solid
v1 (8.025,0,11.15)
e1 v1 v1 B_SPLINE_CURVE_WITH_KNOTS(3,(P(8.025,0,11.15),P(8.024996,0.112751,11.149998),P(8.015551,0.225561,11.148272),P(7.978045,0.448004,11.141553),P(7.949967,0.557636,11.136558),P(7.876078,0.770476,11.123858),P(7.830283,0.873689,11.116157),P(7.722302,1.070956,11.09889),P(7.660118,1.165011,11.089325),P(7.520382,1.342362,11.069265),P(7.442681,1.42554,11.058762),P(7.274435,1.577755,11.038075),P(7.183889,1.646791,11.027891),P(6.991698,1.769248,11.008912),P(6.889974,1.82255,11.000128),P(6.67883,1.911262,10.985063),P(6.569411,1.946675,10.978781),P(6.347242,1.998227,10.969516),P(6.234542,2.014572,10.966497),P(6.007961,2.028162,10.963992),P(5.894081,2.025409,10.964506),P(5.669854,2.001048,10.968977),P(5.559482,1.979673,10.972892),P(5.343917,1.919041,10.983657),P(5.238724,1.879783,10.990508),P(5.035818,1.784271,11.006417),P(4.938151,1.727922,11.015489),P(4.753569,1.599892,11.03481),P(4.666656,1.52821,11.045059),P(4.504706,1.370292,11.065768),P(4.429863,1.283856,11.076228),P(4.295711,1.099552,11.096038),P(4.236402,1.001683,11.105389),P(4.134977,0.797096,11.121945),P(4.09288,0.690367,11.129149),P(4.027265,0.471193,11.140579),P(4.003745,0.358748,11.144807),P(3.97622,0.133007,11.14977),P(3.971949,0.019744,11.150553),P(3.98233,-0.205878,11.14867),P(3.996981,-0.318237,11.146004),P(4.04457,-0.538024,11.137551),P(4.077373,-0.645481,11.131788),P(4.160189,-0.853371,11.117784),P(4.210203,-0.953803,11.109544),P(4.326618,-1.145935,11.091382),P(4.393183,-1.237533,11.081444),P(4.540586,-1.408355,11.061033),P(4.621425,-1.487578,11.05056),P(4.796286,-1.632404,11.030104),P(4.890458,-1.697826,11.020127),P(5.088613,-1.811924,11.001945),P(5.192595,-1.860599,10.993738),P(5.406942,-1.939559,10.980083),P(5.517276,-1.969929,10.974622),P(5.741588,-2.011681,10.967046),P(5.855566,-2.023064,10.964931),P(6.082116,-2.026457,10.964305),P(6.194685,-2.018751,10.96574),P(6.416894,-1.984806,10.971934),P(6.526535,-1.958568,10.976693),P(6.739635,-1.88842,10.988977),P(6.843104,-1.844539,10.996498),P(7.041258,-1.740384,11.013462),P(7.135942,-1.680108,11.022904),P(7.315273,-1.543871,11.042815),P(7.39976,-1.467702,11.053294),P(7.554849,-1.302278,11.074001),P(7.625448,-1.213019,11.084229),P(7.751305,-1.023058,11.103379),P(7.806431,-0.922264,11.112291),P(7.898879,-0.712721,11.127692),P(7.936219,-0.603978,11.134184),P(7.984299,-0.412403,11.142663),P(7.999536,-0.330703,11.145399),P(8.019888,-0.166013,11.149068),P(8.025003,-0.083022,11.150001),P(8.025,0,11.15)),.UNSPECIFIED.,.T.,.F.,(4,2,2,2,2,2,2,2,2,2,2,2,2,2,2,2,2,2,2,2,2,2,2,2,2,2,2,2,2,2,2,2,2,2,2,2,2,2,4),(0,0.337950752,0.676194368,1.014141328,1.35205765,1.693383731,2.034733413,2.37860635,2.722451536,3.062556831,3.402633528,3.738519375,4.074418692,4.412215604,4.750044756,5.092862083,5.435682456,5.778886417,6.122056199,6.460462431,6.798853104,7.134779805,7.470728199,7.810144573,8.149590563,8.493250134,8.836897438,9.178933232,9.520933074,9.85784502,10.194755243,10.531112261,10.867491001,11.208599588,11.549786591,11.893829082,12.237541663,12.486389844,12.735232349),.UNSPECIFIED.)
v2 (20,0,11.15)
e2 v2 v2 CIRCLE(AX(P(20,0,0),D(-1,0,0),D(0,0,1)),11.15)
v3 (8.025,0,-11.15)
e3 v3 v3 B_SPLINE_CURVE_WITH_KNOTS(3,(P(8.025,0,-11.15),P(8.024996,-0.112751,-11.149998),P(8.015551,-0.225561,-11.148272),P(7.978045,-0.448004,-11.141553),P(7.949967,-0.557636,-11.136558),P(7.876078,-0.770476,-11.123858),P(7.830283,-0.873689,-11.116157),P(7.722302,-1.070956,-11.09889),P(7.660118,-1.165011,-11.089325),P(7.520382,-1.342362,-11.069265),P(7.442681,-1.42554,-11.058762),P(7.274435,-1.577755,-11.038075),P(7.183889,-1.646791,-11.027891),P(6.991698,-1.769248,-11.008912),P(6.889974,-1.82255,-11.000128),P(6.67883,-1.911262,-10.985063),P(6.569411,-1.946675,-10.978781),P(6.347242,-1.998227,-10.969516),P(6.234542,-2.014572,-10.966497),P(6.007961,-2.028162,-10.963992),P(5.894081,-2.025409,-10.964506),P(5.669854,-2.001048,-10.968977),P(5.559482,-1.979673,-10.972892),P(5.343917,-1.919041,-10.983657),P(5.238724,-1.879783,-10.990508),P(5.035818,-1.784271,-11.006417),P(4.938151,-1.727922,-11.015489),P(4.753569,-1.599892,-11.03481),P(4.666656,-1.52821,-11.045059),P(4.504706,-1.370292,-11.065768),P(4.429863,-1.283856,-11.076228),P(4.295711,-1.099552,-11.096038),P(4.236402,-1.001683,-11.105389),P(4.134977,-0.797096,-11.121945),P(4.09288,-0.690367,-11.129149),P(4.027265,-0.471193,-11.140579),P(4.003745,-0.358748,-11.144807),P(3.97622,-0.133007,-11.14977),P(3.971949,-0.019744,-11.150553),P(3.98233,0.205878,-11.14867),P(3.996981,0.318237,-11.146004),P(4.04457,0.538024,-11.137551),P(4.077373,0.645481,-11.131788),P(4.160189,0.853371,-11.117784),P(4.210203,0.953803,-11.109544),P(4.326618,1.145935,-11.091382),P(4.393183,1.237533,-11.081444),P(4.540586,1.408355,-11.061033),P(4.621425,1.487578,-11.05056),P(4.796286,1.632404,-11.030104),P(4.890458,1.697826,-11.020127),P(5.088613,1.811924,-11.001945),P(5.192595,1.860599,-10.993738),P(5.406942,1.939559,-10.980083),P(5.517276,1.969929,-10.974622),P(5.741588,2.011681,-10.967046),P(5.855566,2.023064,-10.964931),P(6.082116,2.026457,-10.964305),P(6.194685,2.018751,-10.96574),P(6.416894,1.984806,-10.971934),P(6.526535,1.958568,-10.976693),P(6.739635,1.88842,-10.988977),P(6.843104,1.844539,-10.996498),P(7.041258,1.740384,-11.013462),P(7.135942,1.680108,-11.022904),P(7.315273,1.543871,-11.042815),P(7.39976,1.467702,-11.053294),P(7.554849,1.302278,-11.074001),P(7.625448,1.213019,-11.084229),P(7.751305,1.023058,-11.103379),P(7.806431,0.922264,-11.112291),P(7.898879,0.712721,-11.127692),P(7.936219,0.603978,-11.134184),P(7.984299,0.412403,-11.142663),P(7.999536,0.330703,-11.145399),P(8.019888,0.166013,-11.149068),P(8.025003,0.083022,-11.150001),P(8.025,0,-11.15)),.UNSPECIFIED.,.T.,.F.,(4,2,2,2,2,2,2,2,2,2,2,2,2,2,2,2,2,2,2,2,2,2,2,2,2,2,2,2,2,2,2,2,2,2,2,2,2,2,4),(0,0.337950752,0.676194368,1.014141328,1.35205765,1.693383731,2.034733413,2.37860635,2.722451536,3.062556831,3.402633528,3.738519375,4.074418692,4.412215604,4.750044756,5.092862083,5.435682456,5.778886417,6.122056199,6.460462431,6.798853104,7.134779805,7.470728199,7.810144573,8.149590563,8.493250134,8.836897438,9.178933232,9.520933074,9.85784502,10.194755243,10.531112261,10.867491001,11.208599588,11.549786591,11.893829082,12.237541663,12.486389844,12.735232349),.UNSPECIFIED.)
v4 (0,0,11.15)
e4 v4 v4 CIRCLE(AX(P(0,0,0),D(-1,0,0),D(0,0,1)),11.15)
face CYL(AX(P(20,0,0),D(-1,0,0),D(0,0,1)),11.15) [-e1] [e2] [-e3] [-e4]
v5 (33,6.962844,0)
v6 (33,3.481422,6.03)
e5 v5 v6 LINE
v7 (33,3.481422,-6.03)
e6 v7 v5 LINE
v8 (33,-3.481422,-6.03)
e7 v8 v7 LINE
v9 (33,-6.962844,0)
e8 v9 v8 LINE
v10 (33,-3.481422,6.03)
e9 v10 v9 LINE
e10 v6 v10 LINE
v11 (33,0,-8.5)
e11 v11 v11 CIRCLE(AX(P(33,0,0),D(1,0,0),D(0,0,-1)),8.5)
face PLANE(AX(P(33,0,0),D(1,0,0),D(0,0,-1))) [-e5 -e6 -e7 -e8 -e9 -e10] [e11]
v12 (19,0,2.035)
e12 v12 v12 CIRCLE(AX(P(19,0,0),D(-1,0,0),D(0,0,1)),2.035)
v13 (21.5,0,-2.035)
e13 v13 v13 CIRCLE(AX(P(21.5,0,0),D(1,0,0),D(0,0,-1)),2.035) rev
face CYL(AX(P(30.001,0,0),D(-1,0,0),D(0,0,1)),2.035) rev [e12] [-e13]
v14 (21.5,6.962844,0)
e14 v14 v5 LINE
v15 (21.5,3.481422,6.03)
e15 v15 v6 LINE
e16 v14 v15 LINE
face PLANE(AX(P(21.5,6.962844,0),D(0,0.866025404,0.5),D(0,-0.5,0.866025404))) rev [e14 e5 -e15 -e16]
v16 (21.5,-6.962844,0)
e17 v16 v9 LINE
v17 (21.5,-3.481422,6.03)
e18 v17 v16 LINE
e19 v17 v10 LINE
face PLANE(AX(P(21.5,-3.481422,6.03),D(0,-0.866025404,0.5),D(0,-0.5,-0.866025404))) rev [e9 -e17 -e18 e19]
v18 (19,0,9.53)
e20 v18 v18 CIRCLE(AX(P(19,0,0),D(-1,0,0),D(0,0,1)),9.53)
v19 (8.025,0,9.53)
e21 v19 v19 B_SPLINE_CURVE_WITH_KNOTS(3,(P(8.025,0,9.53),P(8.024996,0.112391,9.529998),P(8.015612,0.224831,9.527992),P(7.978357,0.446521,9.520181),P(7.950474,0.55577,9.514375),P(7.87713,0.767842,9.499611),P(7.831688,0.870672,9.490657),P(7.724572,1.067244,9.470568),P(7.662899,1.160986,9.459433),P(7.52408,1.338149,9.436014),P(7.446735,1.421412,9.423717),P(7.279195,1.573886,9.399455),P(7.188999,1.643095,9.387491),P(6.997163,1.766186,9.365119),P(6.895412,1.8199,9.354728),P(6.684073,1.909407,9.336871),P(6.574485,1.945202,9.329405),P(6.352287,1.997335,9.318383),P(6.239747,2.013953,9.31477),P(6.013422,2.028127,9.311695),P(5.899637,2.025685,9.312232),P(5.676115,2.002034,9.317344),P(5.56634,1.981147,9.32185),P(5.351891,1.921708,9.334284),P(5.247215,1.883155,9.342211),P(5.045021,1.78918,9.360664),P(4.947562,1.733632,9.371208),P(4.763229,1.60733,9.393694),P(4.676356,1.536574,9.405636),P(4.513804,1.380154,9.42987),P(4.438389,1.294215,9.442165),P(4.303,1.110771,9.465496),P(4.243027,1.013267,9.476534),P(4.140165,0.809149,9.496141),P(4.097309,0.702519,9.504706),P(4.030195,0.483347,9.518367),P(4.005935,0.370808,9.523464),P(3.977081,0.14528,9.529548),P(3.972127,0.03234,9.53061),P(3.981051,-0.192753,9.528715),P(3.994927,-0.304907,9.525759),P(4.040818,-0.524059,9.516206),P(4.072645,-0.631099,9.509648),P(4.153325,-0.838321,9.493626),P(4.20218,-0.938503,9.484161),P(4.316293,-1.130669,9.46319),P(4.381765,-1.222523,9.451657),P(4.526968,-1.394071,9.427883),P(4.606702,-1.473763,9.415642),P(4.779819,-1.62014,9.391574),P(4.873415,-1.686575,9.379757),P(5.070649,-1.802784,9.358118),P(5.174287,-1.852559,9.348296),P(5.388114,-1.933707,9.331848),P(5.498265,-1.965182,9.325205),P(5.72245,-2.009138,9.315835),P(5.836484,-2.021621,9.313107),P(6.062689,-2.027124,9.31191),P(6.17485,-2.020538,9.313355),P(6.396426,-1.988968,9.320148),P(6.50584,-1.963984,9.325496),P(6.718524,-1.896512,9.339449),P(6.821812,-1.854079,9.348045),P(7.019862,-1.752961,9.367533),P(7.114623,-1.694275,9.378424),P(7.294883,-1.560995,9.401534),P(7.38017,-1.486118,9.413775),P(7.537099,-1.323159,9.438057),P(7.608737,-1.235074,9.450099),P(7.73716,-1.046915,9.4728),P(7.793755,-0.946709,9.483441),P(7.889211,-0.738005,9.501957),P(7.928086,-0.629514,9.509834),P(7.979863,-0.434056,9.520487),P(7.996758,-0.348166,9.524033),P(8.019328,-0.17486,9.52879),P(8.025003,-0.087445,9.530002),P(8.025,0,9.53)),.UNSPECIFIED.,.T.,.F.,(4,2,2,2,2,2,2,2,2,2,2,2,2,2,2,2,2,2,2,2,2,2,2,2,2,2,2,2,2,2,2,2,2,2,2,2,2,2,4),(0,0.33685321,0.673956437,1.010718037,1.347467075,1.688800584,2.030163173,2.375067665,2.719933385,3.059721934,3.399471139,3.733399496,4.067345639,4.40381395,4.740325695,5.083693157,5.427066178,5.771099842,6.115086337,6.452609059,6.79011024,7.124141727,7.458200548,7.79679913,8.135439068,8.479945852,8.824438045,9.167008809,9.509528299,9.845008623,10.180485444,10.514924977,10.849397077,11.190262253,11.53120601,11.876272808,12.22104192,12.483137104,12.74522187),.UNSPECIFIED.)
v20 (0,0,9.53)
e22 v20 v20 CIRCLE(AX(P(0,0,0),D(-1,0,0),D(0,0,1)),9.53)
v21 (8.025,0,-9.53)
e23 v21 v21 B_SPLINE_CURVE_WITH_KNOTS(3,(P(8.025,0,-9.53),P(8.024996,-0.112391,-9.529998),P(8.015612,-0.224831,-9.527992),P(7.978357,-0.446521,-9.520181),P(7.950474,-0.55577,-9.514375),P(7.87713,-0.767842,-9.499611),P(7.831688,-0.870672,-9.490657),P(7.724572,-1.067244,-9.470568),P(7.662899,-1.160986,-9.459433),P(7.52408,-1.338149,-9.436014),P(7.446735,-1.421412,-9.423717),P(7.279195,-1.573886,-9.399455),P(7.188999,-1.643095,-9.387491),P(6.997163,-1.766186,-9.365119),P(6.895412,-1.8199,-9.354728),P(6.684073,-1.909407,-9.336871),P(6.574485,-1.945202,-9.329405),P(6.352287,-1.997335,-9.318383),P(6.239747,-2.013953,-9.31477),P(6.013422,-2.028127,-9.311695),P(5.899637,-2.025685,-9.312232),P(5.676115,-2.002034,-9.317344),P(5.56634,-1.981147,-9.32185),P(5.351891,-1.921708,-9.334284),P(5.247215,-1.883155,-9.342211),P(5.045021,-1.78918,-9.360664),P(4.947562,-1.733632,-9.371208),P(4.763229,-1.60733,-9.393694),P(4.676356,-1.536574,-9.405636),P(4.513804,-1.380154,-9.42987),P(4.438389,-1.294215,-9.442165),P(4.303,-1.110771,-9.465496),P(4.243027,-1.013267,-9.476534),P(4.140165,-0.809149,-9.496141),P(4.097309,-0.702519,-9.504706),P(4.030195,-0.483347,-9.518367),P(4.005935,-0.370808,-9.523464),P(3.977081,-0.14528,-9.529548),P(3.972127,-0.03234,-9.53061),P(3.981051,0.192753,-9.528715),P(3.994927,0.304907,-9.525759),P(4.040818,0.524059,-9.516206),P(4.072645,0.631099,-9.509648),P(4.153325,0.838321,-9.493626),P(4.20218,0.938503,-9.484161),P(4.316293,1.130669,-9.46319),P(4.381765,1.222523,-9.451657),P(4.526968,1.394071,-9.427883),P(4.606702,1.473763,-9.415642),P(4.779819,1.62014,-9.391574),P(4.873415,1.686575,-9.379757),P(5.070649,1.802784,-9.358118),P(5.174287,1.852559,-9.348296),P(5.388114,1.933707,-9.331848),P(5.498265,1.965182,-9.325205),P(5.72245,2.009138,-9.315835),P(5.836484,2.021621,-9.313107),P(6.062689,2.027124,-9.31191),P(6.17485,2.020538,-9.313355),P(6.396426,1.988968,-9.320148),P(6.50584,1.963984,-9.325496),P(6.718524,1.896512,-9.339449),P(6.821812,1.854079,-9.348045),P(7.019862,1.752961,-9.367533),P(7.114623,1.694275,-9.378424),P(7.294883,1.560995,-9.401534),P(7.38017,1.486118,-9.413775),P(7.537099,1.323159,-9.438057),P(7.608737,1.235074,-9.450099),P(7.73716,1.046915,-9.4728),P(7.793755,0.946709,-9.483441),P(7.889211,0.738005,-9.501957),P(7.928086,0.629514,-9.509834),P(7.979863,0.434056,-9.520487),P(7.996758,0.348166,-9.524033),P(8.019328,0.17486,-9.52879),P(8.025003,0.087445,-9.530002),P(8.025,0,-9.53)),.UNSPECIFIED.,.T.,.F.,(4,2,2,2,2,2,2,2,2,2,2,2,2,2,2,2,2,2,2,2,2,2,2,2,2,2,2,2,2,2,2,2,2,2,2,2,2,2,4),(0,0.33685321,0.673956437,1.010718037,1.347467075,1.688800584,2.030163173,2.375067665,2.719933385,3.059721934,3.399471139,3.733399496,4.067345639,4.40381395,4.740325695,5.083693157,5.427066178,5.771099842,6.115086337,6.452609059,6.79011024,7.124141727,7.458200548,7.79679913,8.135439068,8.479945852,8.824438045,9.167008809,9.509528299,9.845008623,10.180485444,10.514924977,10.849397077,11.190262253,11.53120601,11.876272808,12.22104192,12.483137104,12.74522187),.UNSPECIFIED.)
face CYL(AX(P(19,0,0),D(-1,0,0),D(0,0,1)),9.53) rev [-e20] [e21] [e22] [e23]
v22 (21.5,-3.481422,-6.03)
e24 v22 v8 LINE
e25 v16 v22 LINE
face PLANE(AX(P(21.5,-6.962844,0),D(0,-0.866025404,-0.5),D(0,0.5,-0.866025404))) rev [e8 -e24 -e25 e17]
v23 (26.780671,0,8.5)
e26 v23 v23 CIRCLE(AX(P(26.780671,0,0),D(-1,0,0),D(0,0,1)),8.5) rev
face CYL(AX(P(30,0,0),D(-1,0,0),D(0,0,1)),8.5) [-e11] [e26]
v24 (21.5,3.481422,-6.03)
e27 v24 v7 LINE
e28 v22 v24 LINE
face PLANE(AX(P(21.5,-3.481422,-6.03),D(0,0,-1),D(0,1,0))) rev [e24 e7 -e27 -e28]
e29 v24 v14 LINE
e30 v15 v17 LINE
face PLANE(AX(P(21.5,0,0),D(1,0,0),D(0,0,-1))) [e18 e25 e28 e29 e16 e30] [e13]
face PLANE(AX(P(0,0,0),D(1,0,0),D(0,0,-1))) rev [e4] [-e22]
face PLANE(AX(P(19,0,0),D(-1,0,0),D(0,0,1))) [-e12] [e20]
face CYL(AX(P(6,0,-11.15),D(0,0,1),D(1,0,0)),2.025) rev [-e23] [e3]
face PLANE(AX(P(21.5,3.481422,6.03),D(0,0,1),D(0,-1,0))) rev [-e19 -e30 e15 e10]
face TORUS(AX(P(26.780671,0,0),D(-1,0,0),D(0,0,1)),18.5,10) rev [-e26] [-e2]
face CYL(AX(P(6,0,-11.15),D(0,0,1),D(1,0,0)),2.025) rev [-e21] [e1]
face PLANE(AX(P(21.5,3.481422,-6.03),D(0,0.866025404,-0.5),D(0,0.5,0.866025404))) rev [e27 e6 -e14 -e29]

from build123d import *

# Parameters (mm, degrees)
CROQUIS1_R                 = 8.5
SALIENTE_EXTRUIR1_DEPTH    = 30
CORTAR_EXTRUIR1_DEPTH      = 8.5
CROQUIS9_R                 = 11.15
SALIENTE_EXTRUIR5_DEPTH    = 20
CROQUIS3_R                 = 9.53
CORTAR_EXTRUIR2_DEPTH      = 19
CORTAR_EXTRUIR3_REACH      = 26.691
CROQUIS4_R                 = 2.035
CORTAR_EXTRUIR4_DEPTH      = 34.891665642
CORTAR_EXTRUIR4_DEPTH_BACK = 34.891665642
CROQUIS5_R                 = 2.025
CROQUIS7_R                 = 8.5
SALIENTE_EXTRUIR3_DEPTH    = 3
REDONDEO1_R                = 10


with BuildPart() as part:
    # Croquis1 → Saliente-Extruir1 (new body)
    with BuildSketch(Plane(origin=(0, 0, 0), x_dir=(0, 0, -1), z_dir=(1, 0, 0))):
        Circle(CROQUIS1_R)
    extrude(amount=SALIENTE_EXTRUIR1_DEPTH)

    # Croquis2 → Cortar-Extruir1 (cut)
    with BuildSketch(Plane(origin=(30, 0, 0), x_dir=(0, 0, -1), z_dir=(1, 0, 0))):
        Polygon((0, -6.962844246), (6.03, -3.481422123), (6.03, 3.481422123), (0, 6.962844246), (-6.03, 3.481422123), (-6.03, -3.481422123), align=None)
    extrude(amount=-CORTAR_EXTRUIR1_DEPTH, mode=Mode.SUBTRACT)

    # Croquis9 → Saliente-Extruir5 (add)
    with BuildSketch(Plane.ZY):
        Circle(CROQUIS9_R)
    extrude(amount=-SALIENTE_EXTRUIR5_DEPTH)

    # Croquis3 → Cortar-Extruir2 (cut)
    with BuildSketch(Plane.ZY):
        Circle(CROQUIS3_R)
    extrude(amount=-CORTAR_EXTRUIR2_DEPTH, mode=Mode.SUBTRACT)

    # Croquis4 → Cortar-Extruir3 (cut, up to next)
    with BuildSketch(Plane.ZY.offset(-19), mode=Mode.PRIVATE) as cortar_extruir3_sk1:
        Circle(CROQUIS4_R)
    cortar_extruir3_tool1 = extrude(cortar_extruir3_sk1.sketch, amount=-CORTAR_EXTRUIR3_REACH, mode=Mode.PRIVATE) & part.part
    add(cortar_extruir3_tool1.solids().sort_by_distance((19, 0, 0))[0], mode=Mode.SUBTRACT)

    # Croquis5 → Cortar-Extruir4 (cut, two sides: drawn at the far end of the back side and taken through both)
    with BuildSketch(Plane.XY.offset(-CORTAR_EXTRUIR4_DEPTH_BACK)):
        with Locations((6, 0)):
            Circle(CROQUIS5_R)
    extrude(amount=CORTAR_EXTRUIR4_DEPTH + CORTAR_EXTRUIR4_DEPTH_BACK, mode=Mode.SUBTRACT)

    # Croquis7 → Saliente-Extruir3 (add)
    with BuildSketch(Plane(origin=(30, 0, 0), x_dir=(0, 0, -1), z_dir=(1, 0, 0))):
        with Locations(Location((0, 0, 0), (0, 0, 180))):
            Circle(CROQUIS7_R)
        Polygon((-6.03, -3.481422123), (0, -6.962844246), (6.03, -3.481422123), (6.03, 3.481422123), (0, 6.962844246), (-6.03, 3.481422123), align=None, mode=Mode.SUBTRACT)
    extrude(amount=SALIENTE_EXTRUIR3_DEPTH)

    # Redondeo1
    # the kernel refuses this fillet: 10 mm, written as the material it adds along each edge
    with BuildSketch(Plane(origin=(20, 0, 0), x_dir=(0, 0, -1), z_dir=(0, 1, 0))) as redondeo1_piece_1:
        with BuildLine():
            CenterArc((18.5, -6.780671058), REDONDEO1_R, 137.307216105, 42.692783895)
            Line((11.15, 0), (11.003, 0.135613421))
            ThreePointArc((11.003, 0.135613421), (9.825, 0.2), (8.5, 0.2))
            Line((8.5, 0.2), (8.3, 0))
            Line((8.3, 0), (8.3, -6.780671058))
            Line((8.3, -6.780671058), (8.5, -6.780671058))
        make_face()
    revolve(axis=Axis((20, 0, 0), (-1, 0, 0)))


solid = part.part
